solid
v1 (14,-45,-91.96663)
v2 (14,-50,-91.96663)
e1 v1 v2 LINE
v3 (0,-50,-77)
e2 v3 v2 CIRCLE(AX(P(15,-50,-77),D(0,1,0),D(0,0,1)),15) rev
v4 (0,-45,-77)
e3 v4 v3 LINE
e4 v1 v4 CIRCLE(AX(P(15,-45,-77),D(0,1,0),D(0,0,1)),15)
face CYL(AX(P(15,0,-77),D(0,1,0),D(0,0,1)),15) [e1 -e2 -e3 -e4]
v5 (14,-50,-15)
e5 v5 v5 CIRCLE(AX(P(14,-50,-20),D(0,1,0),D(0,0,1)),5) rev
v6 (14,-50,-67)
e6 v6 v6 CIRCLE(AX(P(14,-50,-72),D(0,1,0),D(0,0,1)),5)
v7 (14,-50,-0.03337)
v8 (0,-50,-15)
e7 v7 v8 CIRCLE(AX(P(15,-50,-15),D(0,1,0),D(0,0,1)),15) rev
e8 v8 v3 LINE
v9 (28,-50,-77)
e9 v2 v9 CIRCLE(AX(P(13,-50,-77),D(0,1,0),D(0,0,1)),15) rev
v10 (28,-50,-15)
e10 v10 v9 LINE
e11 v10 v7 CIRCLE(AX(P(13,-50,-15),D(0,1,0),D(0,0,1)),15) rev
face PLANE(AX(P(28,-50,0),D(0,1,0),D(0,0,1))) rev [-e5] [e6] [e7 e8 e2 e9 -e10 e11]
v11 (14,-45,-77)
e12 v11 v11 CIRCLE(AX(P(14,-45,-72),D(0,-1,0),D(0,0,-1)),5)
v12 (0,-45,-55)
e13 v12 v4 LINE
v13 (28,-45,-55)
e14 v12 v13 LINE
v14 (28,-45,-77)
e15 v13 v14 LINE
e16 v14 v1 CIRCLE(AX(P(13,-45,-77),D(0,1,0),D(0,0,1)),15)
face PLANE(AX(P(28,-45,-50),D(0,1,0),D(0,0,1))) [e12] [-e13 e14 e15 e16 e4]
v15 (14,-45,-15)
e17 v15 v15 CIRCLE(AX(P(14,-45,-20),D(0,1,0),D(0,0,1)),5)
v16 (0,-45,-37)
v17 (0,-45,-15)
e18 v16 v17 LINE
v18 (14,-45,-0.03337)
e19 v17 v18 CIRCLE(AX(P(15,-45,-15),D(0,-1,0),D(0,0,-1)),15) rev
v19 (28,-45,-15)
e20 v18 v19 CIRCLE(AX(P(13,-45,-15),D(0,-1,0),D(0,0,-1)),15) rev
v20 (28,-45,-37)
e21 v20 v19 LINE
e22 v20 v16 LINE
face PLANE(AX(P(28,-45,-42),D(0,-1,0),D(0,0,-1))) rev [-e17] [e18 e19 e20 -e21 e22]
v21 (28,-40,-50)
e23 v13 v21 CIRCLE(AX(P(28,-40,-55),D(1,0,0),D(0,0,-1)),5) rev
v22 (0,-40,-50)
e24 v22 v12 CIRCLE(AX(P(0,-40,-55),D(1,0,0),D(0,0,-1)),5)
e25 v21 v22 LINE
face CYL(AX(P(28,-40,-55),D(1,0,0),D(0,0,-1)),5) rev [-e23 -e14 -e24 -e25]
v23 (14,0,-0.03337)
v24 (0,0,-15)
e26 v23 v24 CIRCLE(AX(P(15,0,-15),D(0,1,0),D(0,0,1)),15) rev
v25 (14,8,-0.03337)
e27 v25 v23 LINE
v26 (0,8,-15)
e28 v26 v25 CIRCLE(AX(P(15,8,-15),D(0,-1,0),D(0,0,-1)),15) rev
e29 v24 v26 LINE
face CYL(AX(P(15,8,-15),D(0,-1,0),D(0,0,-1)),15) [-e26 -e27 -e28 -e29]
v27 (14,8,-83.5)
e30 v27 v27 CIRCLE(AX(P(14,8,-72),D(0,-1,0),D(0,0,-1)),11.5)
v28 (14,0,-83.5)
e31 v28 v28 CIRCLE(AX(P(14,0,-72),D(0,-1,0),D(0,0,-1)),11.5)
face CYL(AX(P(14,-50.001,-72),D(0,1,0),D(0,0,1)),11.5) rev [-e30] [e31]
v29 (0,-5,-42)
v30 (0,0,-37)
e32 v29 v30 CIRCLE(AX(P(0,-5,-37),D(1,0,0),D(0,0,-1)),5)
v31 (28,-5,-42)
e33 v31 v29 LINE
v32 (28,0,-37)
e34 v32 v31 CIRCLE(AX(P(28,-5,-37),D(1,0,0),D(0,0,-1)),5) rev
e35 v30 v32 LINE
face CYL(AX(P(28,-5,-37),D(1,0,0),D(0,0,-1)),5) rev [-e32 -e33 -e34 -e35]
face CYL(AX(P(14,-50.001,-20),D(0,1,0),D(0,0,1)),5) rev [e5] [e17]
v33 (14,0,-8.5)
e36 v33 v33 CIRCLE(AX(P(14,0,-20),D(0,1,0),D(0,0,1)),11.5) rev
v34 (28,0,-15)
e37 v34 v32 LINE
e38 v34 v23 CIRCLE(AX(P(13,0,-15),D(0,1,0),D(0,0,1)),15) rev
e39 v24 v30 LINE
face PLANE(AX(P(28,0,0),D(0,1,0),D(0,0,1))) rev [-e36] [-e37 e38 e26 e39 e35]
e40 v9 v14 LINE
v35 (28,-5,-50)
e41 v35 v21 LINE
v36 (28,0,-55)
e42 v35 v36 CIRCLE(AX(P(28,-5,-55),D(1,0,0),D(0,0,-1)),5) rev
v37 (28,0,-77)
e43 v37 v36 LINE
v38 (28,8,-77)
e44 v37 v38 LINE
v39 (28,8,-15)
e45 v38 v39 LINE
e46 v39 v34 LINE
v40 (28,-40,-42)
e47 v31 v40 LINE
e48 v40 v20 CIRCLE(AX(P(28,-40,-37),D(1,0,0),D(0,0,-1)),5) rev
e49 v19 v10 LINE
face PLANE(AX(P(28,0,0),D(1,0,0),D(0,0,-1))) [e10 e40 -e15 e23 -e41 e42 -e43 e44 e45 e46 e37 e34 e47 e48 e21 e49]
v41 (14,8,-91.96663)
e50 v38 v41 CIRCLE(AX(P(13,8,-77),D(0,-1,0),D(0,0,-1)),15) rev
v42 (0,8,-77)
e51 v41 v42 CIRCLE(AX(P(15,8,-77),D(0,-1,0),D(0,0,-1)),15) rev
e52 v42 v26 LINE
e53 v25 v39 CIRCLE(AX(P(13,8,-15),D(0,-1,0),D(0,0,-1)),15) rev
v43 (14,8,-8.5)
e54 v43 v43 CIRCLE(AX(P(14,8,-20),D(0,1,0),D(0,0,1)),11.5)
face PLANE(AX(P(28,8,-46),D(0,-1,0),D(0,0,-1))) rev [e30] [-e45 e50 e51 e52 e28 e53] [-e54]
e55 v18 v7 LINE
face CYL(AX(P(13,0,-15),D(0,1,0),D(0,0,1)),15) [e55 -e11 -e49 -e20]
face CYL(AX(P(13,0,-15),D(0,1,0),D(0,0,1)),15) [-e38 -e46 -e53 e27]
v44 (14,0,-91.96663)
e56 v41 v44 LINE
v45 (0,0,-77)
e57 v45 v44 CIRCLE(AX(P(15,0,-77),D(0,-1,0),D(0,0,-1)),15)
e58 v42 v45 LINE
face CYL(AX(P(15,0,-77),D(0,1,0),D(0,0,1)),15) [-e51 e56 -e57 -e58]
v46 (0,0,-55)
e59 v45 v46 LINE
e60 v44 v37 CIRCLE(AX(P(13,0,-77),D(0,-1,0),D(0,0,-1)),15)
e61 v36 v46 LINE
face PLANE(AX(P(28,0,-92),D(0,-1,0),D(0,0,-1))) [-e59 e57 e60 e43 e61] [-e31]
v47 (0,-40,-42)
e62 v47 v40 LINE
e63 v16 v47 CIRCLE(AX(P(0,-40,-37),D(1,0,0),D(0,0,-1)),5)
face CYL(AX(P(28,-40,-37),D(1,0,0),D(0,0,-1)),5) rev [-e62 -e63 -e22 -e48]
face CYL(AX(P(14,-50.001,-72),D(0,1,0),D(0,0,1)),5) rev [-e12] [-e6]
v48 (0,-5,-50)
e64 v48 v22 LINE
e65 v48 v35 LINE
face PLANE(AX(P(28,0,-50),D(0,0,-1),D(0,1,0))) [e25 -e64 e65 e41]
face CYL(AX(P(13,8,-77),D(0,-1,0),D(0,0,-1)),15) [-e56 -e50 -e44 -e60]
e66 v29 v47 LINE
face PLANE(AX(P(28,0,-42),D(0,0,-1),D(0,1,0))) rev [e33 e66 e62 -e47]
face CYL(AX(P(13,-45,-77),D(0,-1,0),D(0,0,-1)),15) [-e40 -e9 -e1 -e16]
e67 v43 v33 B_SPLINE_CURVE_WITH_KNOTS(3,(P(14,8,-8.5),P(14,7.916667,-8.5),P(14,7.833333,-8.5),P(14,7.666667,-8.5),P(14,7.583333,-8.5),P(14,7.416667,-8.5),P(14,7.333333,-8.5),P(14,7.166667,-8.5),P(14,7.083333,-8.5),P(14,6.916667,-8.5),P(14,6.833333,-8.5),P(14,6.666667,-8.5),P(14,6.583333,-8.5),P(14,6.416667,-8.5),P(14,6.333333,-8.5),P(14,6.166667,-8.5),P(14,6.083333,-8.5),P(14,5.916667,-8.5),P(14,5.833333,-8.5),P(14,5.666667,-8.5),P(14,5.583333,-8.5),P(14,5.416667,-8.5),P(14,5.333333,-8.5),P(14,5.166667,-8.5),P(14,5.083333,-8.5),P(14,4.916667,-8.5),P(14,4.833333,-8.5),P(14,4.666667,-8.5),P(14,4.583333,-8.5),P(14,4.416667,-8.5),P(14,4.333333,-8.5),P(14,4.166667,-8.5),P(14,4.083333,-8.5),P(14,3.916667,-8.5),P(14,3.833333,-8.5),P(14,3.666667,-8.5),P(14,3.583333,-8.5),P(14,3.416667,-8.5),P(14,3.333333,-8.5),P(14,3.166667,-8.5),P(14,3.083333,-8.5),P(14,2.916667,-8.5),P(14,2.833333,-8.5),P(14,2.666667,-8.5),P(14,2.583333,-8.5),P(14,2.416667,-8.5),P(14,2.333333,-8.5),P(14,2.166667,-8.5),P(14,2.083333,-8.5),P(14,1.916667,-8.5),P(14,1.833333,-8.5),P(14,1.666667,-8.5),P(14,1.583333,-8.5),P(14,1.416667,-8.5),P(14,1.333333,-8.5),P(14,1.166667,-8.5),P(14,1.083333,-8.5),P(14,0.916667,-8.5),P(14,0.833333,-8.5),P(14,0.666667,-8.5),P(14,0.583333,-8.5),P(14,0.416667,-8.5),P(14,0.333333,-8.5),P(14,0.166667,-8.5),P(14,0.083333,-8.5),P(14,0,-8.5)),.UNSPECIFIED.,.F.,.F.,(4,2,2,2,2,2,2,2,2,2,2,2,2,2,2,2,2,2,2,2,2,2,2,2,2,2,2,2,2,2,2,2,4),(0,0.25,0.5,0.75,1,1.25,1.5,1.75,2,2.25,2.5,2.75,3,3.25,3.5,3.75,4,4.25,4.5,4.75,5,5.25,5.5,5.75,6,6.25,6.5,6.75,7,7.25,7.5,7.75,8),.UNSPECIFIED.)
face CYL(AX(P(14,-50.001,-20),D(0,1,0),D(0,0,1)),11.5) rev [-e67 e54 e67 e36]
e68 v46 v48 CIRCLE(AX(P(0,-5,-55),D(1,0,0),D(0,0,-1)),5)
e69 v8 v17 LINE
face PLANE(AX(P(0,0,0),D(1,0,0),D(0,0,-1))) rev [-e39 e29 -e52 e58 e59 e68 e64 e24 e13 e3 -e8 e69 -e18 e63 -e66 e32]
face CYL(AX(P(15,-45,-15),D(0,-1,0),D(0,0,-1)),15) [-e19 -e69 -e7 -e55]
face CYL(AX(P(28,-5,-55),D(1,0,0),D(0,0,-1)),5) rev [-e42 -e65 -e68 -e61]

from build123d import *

# Parameters (mm, degrees)
BOSS_EXTRUDE1_DEPTH  = 28
CUT_EXTRUDE1_REACH   = 81.145
SKETCH2_R            = 11.5
CUT_EXTRUDE2_REACH   = 77.558
SKETCH3_R            = 5
FILLET2_R            = 5
FILLET2_OF_MIRROR2_R = 5
FILLET3_R            = 15


with BuildPart() as part:
    # Sketch1 → Boss-Extrude1 (new body)
    with BuildSketch(Plane(origin=(0, 0, 0), x_dir=(0, 0, -1), z_dir=(1, 0, 0))):
        Polygon((0, 0), (42, 0), (42, -45), (0, -45), (0, -50), (46, -50), (46, 8), (0, 8), align=None)
    boss_extrude1 = extrude(amount=BOSS_EXTRUDE1_DEPTH)

    # Sketch2 → Cut-Extrude1 (cut, up to next)
    with BuildSketch(Plane(origin=(0, 8, 0), x_dir=(1, 0, 0), z_dir=(0, 1, 0)), mode=Mode.PRIVATE) as cut_extrude1_sk1:
        with Locations(Location((14, 20, 0), (0, 0, 270))):
            Circle(SKETCH2_R)
    cut_extrude1_tool1 = extrude(cut_extrude1_sk1.sketch, amount=-CUT_EXTRUDE1_REACH, mode=Mode.PRIVATE) & part.part
    cut_extrude1 = cut_extrude1_tool1.solids().sort_by_distance((14, 8, -20))[0]
    add(cut_extrude1, mode=Mode.SUBTRACT)

    # Sketch3 → Cut-Extrude2 (cut, up to next)
    with BuildSketch(Plane(origin=(0, -45, 0), x_dir=(1, 0, 0), z_dir=(0, 1, 0)), mode=Mode.PRIVATE) as cut_extrude2_sk1:
        with Locations(Location((14, 20, 0), (0, 0, 270))):
            Circle(SKETCH3_R)
    cut_extrude2_tool1 = extrude(cut_extrude2_sk1.sketch, amount=-CUT_EXTRUDE2_REACH, mode=Mode.PRIVATE) & part.part
    cut_extrude2 = cut_extrude2_tool1.solids().sort_by_distance((14, -45, -20))[0]
    add(cut_extrude2, mode=Mode.SUBTRACT)

    # Fillet2
    fillet2_edges = [part.edges().sort_by_distance(p)[0] for p in [
        (14, -45, -42),
        (14, 0, -42),
    ]]
    fillet(fillet2_edges, radius=FILLET2_R)

    # Mirror2: Boss-Extrude1, Cut-Extrude1, Cut-Extrude2 across plane
    add(boss_extrude1.mirror(Plane(origin=(28, -50, -46), x_dir=(1, 0, 0), z_dir=(0, 0, 1))))
    add(cut_extrude1.mirror(Plane(origin=(28, -50, -46), x_dir=(1, 0, 0), z_dir=(0, 0, 1))), mode=Mode.SUBTRACT)
    add(cut_extrude2.mirror(Plane(origin=(28, -50, -46), x_dir=(1, 0, 0), z_dir=(0, 0, 1))), mode=Mode.SUBTRACT)

    # Fillet2 of Mirror2
    fillet2_of_mirror2_edges = [part.edges().sort_by_distance(p)[0] for p in [
        (14, -45, -50),
        (14, 0, -50),
    ]]
    fillet(fillet2_of_mirror2_edges, radius=FILLET2_OF_MIRROR2_R)

    # Fillet3
    # the kernel refuses this fillet: 15 mm, written as the material it takes off along each edge
    with BuildSketch(Plane(origin=(0, -7.5, 0), x_dir=(0, 0, -1), z_dir=(0, -1, 0)), Plane(origin=(28, -7.5, 0), x_dir=(-1, 0, 0), z_dir=(0, -1, 0))) as fillet3_piece_1:
        with BuildLine():
            CenterArc((FILLET3_R, FILLET3_R), FILLET3_R, 180, 90)
            Line((0, FILLET3_R), (0, 0))
            Line((0, 0), (FILLET3_R, 0))
        make_face()
    extrude(amount=80, mode=Mode.SUBTRACT)
    with BuildSketch(Plane(origin=(0, 45.5, 0), x_dir=(0, 0, -1), z_dir=(0, -1, 0)), Plane(origin=(28, 45.5, 0), x_dir=(-1, 0, 0), z_dir=(0, -1, 0))) as fillet3_piece_2:
        with BuildLine():
            CenterArc((FILLET3_R, FILLET3_R), FILLET3_R, 180, 90)
            Line((0, FILLET3_R), (0, 0))
            Line((0, 0), (FILLET3_R, 0))
        make_face()
    extrude(amount=83, mode=Mode.SUBTRACT)
    with BuildSketch(Plane(origin=(0, 45.5, -92), x_dir=(0, 0, 1), z_dir=(0, -1, 0)), Plane(origin=(28, 45.5, -92), x_dir=(-1, 0, 0), z_dir=(0, -1, 0))) as fillet3_piece_3:
        with BuildLine():
            CenterArc((FILLET3_R, -FILLET3_R), FILLET3_R, 90, 90)
            Line((0, -FILLET3_R), (0, 0))
            Line((0, 0), (FILLET3_R, 0))
        make_face()
    extrude(amount=83, mode=Mode.SUBTRACT)
    with BuildSketch(Plane(origin=(0, -7.5, -92), x_dir=(0, 0, 1), z_dir=(0, -1, 0)), Plane(origin=(28, -7.5, -92), x_dir=(-1, 0, 0), z_dir=(0, -1, 0))) as fillet3_piece_4:
        with BuildLine():
            CenterArc((FILLET3_R, -FILLET3_R), FILLET3_R, 90, 90)
            Line((0, -FILLET3_R), (0, 0))
            Line((0, 0), (FILLET3_R, 0))
        make_face()
    extrude(amount=80, mode=Mode.SUBTRACT)


solid = part.part
